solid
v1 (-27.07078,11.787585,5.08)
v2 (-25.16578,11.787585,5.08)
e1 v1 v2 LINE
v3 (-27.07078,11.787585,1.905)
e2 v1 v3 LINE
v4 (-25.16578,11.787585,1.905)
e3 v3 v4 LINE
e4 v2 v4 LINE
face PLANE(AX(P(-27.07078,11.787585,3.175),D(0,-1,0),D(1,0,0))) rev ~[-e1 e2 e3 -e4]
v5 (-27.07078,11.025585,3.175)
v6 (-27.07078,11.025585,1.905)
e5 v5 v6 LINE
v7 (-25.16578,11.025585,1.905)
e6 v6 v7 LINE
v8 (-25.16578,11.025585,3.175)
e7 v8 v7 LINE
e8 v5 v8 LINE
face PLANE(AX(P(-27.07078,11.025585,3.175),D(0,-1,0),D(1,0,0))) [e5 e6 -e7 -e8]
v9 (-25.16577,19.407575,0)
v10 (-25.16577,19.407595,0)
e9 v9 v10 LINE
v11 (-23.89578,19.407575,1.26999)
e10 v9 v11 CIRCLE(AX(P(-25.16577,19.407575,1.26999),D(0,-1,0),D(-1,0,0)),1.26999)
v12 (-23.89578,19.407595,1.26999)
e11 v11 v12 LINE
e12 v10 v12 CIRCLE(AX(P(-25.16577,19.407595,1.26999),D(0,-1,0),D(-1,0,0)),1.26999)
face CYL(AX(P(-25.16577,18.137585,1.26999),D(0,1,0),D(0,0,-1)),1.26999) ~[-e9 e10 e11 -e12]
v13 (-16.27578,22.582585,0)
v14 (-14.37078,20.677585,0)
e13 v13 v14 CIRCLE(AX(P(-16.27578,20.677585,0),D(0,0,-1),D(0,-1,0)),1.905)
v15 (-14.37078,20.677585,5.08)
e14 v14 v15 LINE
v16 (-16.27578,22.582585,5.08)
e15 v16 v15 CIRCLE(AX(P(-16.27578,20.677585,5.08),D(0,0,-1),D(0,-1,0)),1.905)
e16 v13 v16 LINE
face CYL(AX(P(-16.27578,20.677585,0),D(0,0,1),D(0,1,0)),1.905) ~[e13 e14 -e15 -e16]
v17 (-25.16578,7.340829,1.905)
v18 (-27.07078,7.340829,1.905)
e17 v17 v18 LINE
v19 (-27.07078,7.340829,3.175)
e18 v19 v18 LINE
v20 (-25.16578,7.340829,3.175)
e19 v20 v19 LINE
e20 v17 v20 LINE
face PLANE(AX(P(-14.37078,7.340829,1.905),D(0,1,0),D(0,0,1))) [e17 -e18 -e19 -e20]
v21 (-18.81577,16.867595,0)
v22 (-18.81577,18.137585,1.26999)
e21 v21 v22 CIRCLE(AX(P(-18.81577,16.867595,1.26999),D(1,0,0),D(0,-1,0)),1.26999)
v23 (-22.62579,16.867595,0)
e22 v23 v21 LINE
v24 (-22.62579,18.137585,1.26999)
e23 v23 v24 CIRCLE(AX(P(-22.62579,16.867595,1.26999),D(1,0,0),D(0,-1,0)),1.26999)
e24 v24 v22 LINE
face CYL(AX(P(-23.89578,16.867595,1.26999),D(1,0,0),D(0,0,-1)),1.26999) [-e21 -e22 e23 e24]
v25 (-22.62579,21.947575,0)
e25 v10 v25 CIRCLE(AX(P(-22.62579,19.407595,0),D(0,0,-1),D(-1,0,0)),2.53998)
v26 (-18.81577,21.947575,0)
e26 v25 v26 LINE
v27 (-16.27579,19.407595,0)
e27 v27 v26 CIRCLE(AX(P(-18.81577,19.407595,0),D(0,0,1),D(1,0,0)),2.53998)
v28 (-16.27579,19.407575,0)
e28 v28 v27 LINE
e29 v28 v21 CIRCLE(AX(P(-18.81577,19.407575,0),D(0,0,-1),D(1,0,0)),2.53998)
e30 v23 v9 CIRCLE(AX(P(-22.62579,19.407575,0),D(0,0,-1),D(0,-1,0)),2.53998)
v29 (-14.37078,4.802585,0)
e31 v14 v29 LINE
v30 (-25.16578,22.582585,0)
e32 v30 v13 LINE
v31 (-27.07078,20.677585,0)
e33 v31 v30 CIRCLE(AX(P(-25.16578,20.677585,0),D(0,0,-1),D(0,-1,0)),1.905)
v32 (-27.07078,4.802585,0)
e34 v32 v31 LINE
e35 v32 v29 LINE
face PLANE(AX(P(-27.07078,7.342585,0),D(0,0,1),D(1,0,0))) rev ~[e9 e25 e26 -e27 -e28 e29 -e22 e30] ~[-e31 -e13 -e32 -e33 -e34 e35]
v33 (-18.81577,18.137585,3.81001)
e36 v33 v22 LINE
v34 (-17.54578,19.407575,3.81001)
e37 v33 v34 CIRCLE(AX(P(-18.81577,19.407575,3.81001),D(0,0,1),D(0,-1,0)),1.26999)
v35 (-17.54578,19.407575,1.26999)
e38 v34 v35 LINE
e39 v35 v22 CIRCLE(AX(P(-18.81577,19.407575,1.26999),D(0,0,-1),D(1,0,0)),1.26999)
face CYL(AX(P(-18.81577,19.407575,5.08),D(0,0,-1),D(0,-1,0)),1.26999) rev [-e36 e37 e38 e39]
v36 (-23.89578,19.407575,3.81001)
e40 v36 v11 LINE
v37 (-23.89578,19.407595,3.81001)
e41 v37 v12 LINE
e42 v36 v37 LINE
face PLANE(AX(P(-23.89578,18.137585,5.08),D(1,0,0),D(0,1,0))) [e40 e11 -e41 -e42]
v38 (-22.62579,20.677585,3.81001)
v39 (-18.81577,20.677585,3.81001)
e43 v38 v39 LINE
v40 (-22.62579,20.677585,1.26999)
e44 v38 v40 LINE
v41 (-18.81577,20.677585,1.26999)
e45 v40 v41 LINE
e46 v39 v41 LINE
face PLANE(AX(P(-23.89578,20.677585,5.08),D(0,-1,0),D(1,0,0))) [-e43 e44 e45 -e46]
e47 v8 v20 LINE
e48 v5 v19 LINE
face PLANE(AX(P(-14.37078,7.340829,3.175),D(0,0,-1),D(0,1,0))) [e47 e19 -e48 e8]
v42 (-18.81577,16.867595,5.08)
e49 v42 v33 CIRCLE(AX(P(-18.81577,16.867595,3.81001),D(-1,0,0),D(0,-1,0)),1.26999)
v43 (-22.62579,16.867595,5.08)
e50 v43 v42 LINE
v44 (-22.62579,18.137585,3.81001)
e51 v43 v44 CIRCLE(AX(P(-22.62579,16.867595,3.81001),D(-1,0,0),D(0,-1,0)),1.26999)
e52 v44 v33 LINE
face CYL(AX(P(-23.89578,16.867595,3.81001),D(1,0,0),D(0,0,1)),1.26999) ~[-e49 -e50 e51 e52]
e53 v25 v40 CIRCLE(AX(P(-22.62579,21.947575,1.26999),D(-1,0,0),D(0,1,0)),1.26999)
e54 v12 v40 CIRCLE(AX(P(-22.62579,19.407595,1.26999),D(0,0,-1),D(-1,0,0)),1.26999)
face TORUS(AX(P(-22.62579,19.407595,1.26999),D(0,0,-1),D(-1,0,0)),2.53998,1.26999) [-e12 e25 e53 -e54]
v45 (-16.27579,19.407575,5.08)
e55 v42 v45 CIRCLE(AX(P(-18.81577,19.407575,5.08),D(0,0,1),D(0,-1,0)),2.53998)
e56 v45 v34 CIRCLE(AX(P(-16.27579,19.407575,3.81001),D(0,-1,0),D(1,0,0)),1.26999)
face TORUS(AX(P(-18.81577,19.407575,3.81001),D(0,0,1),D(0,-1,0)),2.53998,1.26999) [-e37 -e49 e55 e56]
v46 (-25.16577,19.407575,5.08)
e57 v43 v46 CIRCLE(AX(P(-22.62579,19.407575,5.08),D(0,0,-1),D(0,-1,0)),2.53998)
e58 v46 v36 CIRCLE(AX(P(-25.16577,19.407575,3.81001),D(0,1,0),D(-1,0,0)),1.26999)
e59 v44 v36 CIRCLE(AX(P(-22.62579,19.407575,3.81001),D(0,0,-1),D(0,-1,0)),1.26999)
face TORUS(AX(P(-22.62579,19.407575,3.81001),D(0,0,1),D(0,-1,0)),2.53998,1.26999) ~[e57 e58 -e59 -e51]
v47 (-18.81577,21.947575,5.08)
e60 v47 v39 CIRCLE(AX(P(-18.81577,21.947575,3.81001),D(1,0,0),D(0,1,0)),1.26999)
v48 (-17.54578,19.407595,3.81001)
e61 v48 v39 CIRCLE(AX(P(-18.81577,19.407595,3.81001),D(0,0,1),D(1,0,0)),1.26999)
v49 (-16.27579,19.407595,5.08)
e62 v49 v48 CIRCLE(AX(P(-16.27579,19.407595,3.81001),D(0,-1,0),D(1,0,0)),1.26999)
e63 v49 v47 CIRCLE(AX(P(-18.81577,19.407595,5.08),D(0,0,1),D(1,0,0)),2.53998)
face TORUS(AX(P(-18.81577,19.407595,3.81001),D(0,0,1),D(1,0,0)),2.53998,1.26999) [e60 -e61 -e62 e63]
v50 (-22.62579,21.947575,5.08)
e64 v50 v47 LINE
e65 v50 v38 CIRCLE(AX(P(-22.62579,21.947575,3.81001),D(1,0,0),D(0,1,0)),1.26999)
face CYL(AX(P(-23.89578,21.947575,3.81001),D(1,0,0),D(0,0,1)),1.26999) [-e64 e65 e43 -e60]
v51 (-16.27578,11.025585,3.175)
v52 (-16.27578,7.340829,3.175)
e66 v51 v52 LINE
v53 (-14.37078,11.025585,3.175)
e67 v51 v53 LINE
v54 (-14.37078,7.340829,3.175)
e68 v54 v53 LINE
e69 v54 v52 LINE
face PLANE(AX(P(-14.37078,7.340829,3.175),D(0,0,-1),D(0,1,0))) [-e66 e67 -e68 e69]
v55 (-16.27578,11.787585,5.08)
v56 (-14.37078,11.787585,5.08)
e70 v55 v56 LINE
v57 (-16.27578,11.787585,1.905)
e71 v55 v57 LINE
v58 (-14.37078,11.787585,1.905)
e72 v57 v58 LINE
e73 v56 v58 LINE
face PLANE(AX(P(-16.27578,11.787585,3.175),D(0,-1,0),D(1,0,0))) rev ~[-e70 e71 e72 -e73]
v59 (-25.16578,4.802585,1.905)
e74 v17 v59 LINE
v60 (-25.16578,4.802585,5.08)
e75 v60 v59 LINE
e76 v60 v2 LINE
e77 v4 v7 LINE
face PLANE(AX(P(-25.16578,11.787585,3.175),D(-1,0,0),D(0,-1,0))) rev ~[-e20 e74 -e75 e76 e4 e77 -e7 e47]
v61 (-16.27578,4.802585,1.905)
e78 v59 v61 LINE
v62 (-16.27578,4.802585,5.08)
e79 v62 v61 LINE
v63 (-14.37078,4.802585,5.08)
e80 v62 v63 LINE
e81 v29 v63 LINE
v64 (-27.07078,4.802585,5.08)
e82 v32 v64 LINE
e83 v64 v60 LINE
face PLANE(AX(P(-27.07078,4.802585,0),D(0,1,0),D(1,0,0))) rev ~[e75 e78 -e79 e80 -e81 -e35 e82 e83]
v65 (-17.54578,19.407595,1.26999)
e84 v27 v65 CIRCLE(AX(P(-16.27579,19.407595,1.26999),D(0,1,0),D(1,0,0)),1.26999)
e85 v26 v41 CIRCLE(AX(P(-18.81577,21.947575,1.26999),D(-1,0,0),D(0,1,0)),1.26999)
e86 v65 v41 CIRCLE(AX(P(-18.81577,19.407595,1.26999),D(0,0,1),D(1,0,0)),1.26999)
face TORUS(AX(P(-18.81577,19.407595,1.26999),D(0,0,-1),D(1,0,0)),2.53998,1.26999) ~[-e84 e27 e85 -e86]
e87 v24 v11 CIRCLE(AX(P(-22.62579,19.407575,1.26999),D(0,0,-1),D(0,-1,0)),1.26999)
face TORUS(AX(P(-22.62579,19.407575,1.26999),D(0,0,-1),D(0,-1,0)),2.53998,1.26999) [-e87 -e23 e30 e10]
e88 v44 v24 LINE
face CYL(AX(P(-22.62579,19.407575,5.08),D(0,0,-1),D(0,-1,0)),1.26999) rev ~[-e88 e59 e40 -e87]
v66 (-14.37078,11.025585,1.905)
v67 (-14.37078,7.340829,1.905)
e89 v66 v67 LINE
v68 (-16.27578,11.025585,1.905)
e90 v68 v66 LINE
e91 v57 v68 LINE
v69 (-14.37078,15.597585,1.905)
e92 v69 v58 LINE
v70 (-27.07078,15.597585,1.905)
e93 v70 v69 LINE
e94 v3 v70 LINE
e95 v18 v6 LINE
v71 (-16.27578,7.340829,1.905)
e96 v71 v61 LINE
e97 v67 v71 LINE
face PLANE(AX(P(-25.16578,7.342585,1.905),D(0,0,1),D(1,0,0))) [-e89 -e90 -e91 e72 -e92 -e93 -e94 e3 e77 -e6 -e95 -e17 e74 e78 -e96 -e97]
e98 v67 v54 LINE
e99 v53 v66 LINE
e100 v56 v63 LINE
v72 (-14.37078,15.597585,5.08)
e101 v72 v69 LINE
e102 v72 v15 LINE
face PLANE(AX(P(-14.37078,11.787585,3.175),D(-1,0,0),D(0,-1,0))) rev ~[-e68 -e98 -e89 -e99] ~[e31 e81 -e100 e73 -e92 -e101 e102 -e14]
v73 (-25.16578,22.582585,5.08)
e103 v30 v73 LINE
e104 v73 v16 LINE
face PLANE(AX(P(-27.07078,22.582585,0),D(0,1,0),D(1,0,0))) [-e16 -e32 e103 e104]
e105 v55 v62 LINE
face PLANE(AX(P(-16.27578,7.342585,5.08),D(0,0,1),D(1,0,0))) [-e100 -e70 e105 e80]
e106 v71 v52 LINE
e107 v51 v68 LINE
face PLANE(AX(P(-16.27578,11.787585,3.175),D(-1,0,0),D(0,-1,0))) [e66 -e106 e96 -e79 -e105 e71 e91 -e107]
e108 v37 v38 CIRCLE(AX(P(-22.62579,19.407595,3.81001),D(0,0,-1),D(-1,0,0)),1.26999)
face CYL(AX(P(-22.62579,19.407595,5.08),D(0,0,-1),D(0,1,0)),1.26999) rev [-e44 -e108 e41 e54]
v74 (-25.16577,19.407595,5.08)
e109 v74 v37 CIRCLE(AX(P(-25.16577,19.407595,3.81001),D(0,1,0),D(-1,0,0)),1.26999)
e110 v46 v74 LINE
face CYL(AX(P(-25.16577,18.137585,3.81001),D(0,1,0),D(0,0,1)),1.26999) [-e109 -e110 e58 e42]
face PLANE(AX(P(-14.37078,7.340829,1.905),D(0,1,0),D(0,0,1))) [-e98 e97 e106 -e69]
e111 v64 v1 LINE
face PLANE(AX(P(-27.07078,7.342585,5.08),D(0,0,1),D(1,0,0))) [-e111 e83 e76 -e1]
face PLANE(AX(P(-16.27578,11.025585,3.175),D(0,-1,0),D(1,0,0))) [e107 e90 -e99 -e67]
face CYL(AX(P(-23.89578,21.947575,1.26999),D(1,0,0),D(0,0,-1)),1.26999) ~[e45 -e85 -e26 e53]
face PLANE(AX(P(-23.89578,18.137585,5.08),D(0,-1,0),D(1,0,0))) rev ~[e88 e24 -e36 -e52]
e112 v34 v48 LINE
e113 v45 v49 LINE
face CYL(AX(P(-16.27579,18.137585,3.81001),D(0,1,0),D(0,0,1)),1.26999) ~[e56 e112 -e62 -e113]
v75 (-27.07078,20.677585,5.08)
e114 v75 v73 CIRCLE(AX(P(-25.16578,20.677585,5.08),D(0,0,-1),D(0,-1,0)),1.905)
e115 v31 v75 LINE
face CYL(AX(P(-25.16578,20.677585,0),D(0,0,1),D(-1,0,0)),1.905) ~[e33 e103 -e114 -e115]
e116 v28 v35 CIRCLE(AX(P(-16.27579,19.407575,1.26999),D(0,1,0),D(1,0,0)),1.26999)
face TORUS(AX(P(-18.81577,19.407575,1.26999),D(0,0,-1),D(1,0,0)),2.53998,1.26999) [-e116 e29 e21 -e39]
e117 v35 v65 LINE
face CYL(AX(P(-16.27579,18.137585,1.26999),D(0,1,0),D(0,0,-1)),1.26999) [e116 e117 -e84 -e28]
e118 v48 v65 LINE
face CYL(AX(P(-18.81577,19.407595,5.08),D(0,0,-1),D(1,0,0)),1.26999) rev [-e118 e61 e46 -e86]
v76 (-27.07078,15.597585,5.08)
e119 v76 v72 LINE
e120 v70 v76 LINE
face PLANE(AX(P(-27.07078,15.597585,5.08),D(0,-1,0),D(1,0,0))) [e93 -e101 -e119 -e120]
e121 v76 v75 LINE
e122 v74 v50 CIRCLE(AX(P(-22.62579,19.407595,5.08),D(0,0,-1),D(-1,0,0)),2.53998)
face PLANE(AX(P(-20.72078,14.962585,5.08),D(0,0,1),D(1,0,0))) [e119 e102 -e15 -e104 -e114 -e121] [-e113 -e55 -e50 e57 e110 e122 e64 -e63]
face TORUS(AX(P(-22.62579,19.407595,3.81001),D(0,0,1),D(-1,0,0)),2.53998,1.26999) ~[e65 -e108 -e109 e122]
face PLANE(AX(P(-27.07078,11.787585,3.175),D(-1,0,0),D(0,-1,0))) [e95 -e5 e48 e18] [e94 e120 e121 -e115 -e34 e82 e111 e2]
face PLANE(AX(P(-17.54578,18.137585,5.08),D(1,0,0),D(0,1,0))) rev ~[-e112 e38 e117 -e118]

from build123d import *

# Parameters (mm, degrees)
F0_W      = 12.7
F0_H      = 15.24
F1_DEPTH  = 5.08
F2_W      = 6.35
F2_H      = 2.54
F3_DEPTH  = 25.4
F4_R      = 1.26999
F5_R      = 1.905
F6_W      = 5.715
F6_H      = 1.27
F7_DEPTH  = 25.4
F8_W      = 8.89
F8_H      = 8.255
F9_DEPTH  = 3.175
F10_W     = 1.905
F10_H     = 3.81
F11_DEPTH = 1.905
F12_DEPTH = 2.54
F13_W     = 2.5417556653
F13_H     = 1.27
F14_DEPTH = 25.4
F15_W     = 1.905
F15_H     = 0.762
F16_DEPTH = 1.27
F17_W     = 1.905
F17_H     = 0.762
F18_DEPTH = 1.27


# Not quite as in the source:
# - a fillet or chamfer is up to 0.001 mm smaller than in the source, because OpenCascade refuses the exact size


with BuildPart() as f1:
    # F0 (on Top) → F1 (new body)
    with BuildSketch(Plane.XY):
        with Locations((-20.7207803614, 14.9625845535)):
            Rectangle(F0_W, F0_H)
    extrude(amount=F1_DEPTH)

    # F2 (on face) → F3 (cut)
    with BuildSketch(Plane.XY.offset(5.08)):
        with Locations((-20.7207803614, 19.4075845535)):
            Rectangle(F2_W, F2_H)
    extrude(amount=-F3_DEPTH, mode=Mode.SUBTRACT)

    # F4 (radius 1.27 in the source; OpenCascade refuses exactly that, so slightly less here)
    f4_edges = [f1.edges().sort_by_distance(p)[0] for p in [
        (-20.72078, 18.137585, 5.08),
        (-17.54578, 19.407585, 5.08),
        (-23.89578, 19.407585, 5.08),
        (-20.72078, 20.677585, 5.08),
        (-17.54578, 19.407585, 0),
        (-20.72078, 18.137585, 0),
        (-23.89578, 19.407585, 0),
        (-20.72078, 20.677585, 0),
        (-17.54578, 18.137585, 2.54),
        (-23.89578, 18.137585, 2.54),
        (-23.89578, 20.677585, 2.54),
        (-17.54578, 20.677585, 2.54),
    ]]
    fillet(f4_edges, radius=F4_R)

    # F5
    f5_edges = [f1.edges().sort_by_distance(p)[0] for p in [
        (-27.07078, 22.582585, 2.54),
        (-14.37078, 22.582585, 2.54),
    ]]
    fillet(f5_edges, radius=F5_R)

    # F6 (on face) → F7 (cut)
    with BuildSketch(Plane.YZ.offset(-14.3707803614)):
        with Locations((12.7400845535, 2.54)):
            Rectangle(F6_W, F6_H)
    extrude(amount=-F7_DEPTH, mode=Mode.SUBTRACT)

    # F8 (on face) → F9 (cut, through all)
    with BuildSketch(Plane.XY.offset(5.08)):
        with Locations((-20.7207803614, 11.4700845535)):
            Rectangle(F8_W, F8_H)
    extrude(amount=-F9_DEPTH, mode=Mode.SUBTRACT)

    # F10 (on face) → F11 (cut, through all)
    with BuildSketch(Plane.XY.offset(5.08)):
        with Locations((-26.1182803614, 13.6925845535)):
            Rectangle(F10_W, F10_H)
        with Locations((-15.3232803614, 13.6925845535)):
            Rectangle(F10_W, F10_H)
    extrude(amount=-F11_DEPTH, mode=Mode.SUBTRACT)

    # F12 (add): a face of the model
    f12_faces = [f1.faces().sort_by_distance(p)[0] for p in [
        (-20.7207803614, 7.3425845535, 1.7991666667),
    ]]
    extrude(f12_faces, amount=F12_DEPTH)

    # F13 (on face) → F14 (cut)
    with BuildSketch(Plane.YZ.offset(-14.3707803614)):
        with Locations((8.6117067208, 2.54)):
            Rectangle(F13_W, F13_H)
    extrude(amount=-F14_DEPTH, mode=Mode.SUBTRACT)

    # F15 (on face) → F16 (join, through all)
    with BuildSketch(Plane(origin=(0, 0, 3.175), x_dir=(1, 0, 0), z_dir=(0, 0, -1))):
        with Locations((-15.3232803614, -11.4065845535)):
            Rectangle(F15_W, F15_H)
    extrude(amount=F16_DEPTH)

    # F17 (on face) → F18 (join, through all)
    with BuildSketch(Plane(origin=(0, 0, 3.175), x_dir=(1, 0, 0), z_dir=(0, 0, -1))):
        with Locations((-26.1182803614, -11.4065845535)):
            Rectangle(F17_W, F17_H)
    extrude(amount=F18_DEPTH)


solid = f1.part
